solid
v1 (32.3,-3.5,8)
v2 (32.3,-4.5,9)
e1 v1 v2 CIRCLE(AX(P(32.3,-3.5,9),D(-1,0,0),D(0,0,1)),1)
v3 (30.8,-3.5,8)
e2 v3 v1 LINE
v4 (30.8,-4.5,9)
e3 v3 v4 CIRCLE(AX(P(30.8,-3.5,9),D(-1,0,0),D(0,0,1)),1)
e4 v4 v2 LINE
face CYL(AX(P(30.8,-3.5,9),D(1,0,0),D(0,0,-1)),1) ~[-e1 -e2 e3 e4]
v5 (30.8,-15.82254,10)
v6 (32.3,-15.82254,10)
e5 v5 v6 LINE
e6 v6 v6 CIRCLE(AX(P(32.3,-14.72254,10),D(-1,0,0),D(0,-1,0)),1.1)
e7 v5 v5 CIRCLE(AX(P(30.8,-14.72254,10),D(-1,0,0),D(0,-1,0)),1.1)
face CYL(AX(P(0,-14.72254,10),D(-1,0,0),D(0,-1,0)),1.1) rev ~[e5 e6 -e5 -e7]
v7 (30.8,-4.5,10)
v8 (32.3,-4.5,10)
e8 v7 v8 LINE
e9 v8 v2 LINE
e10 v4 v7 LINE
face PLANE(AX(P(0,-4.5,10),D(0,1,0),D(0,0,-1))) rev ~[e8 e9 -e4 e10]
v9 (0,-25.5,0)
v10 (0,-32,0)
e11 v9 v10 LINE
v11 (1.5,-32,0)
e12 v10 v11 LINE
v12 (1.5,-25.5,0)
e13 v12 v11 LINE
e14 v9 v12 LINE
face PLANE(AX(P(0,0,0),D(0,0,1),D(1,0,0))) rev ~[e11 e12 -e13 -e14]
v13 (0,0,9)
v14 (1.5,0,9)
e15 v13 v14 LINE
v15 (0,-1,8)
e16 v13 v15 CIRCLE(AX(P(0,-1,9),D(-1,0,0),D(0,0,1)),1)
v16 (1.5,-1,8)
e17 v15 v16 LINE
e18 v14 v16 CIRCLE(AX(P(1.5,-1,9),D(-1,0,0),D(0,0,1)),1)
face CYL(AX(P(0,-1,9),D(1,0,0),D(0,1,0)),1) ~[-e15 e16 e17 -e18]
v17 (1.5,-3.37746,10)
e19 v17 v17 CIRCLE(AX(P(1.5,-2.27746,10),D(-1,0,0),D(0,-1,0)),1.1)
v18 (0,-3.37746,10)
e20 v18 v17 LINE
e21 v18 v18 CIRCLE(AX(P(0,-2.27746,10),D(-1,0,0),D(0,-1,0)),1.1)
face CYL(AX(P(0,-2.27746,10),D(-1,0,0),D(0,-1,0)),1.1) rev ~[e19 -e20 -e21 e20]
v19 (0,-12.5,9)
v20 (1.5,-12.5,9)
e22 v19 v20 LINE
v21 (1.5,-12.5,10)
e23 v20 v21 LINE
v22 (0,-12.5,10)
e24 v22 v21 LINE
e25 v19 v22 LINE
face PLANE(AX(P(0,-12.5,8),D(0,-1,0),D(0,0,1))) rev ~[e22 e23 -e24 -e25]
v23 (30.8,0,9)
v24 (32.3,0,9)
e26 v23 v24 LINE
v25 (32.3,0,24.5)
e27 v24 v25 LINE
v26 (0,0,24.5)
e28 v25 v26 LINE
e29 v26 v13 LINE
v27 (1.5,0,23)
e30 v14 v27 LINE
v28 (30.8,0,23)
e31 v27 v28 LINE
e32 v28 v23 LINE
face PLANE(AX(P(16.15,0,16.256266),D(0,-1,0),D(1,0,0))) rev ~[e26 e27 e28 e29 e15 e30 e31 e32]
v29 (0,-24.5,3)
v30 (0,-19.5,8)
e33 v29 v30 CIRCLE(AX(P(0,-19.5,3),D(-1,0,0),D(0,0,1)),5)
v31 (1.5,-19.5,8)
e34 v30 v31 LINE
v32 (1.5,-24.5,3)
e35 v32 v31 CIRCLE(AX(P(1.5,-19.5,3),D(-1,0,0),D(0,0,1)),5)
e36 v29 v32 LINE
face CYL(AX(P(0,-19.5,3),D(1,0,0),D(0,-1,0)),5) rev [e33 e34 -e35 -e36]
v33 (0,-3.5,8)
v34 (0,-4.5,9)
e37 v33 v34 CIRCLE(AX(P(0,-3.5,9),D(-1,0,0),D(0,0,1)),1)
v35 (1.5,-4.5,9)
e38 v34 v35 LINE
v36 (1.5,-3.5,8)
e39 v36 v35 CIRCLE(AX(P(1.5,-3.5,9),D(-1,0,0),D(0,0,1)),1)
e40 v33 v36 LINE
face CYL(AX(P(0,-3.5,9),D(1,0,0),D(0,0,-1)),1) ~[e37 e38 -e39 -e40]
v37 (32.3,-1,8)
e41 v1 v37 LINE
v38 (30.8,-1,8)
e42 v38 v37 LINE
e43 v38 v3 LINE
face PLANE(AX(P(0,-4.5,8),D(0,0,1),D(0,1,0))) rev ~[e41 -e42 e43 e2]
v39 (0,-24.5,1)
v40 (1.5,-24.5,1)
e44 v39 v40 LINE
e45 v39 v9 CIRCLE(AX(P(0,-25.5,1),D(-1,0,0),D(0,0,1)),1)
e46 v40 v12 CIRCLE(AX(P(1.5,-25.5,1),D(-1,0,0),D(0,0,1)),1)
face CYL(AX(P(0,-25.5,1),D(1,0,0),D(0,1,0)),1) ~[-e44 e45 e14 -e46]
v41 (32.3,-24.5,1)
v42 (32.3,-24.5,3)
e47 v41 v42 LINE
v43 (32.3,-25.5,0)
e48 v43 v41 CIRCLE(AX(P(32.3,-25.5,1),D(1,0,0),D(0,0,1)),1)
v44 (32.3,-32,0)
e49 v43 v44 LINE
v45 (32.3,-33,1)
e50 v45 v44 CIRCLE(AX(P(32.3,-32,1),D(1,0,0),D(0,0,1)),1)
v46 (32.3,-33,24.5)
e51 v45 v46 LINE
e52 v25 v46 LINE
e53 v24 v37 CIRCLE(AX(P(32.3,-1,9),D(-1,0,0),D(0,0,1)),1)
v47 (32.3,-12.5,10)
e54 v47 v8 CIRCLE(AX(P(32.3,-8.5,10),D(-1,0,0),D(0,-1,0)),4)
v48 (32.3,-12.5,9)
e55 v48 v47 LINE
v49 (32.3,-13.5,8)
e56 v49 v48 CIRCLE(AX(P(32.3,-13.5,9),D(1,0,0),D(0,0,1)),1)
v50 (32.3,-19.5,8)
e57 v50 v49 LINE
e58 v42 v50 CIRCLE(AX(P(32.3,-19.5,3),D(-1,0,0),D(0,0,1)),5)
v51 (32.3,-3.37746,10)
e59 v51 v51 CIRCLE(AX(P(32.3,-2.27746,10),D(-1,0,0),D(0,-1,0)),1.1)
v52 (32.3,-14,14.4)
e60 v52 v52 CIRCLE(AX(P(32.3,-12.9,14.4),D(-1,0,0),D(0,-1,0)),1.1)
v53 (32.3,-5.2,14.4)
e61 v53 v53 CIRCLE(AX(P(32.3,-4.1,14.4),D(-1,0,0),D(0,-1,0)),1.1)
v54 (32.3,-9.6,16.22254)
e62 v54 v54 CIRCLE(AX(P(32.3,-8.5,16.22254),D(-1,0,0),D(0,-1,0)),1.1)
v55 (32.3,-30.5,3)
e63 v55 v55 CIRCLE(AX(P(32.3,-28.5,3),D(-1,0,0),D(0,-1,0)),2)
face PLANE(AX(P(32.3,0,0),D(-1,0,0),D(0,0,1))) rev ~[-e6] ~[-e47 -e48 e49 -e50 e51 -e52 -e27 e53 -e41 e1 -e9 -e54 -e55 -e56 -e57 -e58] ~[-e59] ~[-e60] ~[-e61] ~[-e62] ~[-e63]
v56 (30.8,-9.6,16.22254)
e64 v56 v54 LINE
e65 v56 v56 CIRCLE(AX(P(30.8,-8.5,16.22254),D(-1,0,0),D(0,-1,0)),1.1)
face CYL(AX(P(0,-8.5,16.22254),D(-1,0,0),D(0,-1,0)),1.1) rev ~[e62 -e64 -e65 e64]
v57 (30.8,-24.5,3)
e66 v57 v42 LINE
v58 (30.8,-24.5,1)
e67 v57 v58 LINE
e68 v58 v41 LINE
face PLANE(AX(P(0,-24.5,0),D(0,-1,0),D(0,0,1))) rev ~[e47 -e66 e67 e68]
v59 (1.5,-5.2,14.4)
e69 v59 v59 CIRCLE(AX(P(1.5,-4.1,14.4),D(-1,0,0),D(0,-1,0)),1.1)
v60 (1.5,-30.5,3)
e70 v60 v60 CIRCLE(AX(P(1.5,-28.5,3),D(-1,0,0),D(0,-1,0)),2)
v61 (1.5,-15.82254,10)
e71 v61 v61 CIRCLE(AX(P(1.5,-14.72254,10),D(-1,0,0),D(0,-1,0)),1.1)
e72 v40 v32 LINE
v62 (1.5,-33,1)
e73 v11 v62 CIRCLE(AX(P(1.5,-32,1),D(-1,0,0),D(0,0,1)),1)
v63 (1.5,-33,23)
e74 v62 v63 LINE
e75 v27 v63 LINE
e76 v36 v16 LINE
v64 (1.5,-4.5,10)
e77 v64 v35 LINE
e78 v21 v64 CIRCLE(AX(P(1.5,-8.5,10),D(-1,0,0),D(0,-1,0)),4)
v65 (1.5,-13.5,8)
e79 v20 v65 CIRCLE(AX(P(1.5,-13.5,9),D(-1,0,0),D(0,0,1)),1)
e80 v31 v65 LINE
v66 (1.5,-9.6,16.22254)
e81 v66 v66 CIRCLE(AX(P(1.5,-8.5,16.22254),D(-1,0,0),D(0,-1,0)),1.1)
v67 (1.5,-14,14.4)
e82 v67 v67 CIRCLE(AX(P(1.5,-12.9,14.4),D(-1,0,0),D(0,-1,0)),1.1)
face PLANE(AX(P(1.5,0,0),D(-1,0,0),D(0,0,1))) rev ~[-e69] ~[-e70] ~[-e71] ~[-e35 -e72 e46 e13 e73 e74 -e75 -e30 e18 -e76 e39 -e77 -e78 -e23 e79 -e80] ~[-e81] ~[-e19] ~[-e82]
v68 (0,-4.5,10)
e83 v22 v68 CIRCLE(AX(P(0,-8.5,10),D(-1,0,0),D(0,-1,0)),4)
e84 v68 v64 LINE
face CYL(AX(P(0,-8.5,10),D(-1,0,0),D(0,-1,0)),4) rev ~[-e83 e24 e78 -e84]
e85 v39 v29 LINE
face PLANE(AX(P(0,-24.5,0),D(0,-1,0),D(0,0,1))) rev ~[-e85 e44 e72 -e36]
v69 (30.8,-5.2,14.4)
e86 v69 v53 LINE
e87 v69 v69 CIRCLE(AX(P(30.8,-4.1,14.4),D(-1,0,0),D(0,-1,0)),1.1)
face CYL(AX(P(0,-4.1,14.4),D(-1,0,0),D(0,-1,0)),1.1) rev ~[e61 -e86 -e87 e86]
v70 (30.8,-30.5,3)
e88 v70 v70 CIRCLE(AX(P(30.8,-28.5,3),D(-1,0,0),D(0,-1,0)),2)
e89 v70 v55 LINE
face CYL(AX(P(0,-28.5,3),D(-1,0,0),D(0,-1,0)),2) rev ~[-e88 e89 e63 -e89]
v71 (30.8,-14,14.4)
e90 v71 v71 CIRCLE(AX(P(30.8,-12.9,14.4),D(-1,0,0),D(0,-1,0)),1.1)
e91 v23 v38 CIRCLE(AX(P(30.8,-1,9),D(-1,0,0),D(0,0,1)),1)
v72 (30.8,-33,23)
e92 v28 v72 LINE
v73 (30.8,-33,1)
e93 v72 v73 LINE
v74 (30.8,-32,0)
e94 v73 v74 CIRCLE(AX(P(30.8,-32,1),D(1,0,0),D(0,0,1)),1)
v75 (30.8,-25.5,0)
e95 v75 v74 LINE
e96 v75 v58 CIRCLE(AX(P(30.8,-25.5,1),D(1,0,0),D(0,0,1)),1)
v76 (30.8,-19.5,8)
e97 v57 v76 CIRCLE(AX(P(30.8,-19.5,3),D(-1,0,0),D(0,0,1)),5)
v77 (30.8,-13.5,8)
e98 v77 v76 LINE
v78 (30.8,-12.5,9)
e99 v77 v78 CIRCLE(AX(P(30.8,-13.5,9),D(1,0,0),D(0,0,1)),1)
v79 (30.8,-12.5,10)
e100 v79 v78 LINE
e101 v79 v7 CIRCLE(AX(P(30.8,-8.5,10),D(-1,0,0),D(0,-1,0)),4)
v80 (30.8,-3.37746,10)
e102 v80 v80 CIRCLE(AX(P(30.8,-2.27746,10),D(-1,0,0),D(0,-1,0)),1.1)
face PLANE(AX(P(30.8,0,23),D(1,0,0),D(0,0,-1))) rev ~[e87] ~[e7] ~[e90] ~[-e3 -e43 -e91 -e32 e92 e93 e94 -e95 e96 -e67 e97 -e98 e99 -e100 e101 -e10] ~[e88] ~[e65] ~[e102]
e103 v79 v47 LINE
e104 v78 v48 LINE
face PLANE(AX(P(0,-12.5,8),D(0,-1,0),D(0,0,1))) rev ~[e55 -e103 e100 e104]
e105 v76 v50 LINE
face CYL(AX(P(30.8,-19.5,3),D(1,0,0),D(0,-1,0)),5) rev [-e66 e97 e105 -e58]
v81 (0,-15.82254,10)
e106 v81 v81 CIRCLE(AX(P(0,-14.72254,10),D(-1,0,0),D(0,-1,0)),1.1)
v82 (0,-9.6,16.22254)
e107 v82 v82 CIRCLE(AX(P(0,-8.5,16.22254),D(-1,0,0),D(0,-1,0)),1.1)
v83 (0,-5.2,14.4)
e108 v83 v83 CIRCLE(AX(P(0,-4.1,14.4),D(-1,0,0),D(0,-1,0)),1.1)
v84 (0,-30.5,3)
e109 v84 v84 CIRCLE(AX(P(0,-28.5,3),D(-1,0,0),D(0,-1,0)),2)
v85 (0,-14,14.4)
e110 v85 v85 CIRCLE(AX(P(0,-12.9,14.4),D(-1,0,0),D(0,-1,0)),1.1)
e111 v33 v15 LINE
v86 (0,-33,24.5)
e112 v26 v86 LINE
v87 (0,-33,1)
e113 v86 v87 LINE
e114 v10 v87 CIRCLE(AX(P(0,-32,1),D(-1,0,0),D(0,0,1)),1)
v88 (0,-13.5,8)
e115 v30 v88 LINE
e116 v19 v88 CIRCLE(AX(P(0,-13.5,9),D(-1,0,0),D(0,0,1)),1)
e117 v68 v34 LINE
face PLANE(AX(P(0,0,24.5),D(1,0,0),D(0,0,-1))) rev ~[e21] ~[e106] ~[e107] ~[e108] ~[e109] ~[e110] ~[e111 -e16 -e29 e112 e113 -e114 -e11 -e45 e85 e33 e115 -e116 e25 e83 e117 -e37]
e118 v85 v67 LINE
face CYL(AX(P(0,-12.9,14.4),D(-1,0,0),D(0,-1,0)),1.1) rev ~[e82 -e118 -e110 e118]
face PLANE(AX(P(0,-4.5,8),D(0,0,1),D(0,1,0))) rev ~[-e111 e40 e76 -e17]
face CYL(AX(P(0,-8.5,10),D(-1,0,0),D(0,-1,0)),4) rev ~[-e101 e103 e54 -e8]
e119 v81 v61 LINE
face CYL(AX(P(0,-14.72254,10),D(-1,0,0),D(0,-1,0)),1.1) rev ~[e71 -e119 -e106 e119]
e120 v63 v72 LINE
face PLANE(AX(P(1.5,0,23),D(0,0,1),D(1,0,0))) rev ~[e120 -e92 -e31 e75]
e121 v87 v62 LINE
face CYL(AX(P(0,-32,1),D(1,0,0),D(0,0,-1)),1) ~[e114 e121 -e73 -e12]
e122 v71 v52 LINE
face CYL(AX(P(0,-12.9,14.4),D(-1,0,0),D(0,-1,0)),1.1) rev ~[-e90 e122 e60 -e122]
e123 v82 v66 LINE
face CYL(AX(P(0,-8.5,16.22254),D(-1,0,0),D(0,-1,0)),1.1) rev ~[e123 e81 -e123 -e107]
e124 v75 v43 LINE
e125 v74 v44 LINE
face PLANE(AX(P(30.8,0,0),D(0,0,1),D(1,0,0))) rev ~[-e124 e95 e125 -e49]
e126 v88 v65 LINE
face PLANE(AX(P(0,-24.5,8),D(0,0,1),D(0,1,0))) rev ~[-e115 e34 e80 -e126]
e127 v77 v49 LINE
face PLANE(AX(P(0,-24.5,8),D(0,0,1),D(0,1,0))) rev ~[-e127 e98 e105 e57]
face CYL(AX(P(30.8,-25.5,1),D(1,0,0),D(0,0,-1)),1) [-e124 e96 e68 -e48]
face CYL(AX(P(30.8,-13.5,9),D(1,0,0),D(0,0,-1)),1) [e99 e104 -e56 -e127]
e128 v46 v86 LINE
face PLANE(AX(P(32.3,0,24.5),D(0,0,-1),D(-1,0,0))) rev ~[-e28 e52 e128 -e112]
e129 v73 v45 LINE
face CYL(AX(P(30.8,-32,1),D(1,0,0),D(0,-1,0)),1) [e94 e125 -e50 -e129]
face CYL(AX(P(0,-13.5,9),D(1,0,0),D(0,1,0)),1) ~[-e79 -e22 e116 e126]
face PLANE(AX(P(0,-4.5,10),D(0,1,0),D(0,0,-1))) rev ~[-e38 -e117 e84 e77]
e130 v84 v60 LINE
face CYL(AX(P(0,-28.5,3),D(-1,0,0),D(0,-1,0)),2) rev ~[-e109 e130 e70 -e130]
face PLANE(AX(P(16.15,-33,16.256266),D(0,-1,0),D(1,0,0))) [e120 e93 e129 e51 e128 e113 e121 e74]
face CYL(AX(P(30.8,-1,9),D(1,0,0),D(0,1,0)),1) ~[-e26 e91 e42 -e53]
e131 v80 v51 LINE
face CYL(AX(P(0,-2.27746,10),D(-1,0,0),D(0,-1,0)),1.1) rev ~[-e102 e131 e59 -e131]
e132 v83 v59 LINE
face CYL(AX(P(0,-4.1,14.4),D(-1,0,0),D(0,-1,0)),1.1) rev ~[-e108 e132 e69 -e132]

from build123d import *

# Parameters (mm, degrees)
F1_DEPTH = 33
F2_R     = 1.1
F2_R_2   = 2
F3_DEPTH = 32.301
F4_R     = 1
F5_R     = 5


with BuildPart() as f1:
    # F0 (on Front) → F1 (new body)
    with BuildSketch(Plane.XZ):
        Polygon((0, 24.5), (0, 0), (1.5, 0), (1.5, 23), (30.8, 23), (30.8, 0), (32.3, 0), (32.3, 24.5), align=None)
    extrude(amount=F1_DEPTH)

    # F2 (on face) → F3 (cut, through all)
    with BuildSketch(Plane(origin=(0, 0, 0), x_dir=(0, -1, 0), z_dir=(-1, 0, 0))):
        with BuildLine():
            Line((0, 8), (0, 0))
            Line((0, 0), (24.5, 0))
            Line((24.5, 0), (24.5, 8))
            Line((24.5, 8), (12.5, 8))
            Line((12.5, 8), (12.5, 10))
            ThreePointArc((12.5, 10), (8.5, 14), (4.5, 10))
            Line((4.5, 10), (4.5, 8))
            Line((4.5, 8), (0, 8))
        make_face()
        with Locations((14.7225396744, 10)):
            Circle(F2_R)
        with Locations((12.9, 14.4)):
            Circle(F2_R)
        with Locations((8.5, 16.2225396744)):
            Circle(F2_R)
        with Locations((4.1, 14.4)):
            Circle(F2_R)
        with Locations((2.2774603256, 10)):
            Circle(F2_R)
        with Locations((28.5, 3)):
            Circle(F2_R_2)
    extrude(amount=-F3_DEPTH, mode=Mode.SUBTRACT)

    # F4
    f4_edges = [f1.edges().sort_by_distance(p)[0] for p in [
        (0.75, -4.5, 8),
        (31.55, -4.5, 8),
        (0.75, -12.5, 8),
        (31.55, -12.5, 8),
        (31.55, 0, 8),
        (0.75, 0, 8),
        (0.75, -24.5, 0),
        (31.55, -24.5, 0),
        (0.75, -33, 0),
        (31.55, -33, 0),
    ]]
    fillet(f4_edges, radius=F4_R)

    # F5
    f5_edges = [f1.edges().sort_by_distance(p)[0] for p in [
        (0.75, -24.5, 8),
        (31.55, -24.5, 8),
    ]]
    fillet(f5_edges, radius=F5_R)


solid = f1.part
